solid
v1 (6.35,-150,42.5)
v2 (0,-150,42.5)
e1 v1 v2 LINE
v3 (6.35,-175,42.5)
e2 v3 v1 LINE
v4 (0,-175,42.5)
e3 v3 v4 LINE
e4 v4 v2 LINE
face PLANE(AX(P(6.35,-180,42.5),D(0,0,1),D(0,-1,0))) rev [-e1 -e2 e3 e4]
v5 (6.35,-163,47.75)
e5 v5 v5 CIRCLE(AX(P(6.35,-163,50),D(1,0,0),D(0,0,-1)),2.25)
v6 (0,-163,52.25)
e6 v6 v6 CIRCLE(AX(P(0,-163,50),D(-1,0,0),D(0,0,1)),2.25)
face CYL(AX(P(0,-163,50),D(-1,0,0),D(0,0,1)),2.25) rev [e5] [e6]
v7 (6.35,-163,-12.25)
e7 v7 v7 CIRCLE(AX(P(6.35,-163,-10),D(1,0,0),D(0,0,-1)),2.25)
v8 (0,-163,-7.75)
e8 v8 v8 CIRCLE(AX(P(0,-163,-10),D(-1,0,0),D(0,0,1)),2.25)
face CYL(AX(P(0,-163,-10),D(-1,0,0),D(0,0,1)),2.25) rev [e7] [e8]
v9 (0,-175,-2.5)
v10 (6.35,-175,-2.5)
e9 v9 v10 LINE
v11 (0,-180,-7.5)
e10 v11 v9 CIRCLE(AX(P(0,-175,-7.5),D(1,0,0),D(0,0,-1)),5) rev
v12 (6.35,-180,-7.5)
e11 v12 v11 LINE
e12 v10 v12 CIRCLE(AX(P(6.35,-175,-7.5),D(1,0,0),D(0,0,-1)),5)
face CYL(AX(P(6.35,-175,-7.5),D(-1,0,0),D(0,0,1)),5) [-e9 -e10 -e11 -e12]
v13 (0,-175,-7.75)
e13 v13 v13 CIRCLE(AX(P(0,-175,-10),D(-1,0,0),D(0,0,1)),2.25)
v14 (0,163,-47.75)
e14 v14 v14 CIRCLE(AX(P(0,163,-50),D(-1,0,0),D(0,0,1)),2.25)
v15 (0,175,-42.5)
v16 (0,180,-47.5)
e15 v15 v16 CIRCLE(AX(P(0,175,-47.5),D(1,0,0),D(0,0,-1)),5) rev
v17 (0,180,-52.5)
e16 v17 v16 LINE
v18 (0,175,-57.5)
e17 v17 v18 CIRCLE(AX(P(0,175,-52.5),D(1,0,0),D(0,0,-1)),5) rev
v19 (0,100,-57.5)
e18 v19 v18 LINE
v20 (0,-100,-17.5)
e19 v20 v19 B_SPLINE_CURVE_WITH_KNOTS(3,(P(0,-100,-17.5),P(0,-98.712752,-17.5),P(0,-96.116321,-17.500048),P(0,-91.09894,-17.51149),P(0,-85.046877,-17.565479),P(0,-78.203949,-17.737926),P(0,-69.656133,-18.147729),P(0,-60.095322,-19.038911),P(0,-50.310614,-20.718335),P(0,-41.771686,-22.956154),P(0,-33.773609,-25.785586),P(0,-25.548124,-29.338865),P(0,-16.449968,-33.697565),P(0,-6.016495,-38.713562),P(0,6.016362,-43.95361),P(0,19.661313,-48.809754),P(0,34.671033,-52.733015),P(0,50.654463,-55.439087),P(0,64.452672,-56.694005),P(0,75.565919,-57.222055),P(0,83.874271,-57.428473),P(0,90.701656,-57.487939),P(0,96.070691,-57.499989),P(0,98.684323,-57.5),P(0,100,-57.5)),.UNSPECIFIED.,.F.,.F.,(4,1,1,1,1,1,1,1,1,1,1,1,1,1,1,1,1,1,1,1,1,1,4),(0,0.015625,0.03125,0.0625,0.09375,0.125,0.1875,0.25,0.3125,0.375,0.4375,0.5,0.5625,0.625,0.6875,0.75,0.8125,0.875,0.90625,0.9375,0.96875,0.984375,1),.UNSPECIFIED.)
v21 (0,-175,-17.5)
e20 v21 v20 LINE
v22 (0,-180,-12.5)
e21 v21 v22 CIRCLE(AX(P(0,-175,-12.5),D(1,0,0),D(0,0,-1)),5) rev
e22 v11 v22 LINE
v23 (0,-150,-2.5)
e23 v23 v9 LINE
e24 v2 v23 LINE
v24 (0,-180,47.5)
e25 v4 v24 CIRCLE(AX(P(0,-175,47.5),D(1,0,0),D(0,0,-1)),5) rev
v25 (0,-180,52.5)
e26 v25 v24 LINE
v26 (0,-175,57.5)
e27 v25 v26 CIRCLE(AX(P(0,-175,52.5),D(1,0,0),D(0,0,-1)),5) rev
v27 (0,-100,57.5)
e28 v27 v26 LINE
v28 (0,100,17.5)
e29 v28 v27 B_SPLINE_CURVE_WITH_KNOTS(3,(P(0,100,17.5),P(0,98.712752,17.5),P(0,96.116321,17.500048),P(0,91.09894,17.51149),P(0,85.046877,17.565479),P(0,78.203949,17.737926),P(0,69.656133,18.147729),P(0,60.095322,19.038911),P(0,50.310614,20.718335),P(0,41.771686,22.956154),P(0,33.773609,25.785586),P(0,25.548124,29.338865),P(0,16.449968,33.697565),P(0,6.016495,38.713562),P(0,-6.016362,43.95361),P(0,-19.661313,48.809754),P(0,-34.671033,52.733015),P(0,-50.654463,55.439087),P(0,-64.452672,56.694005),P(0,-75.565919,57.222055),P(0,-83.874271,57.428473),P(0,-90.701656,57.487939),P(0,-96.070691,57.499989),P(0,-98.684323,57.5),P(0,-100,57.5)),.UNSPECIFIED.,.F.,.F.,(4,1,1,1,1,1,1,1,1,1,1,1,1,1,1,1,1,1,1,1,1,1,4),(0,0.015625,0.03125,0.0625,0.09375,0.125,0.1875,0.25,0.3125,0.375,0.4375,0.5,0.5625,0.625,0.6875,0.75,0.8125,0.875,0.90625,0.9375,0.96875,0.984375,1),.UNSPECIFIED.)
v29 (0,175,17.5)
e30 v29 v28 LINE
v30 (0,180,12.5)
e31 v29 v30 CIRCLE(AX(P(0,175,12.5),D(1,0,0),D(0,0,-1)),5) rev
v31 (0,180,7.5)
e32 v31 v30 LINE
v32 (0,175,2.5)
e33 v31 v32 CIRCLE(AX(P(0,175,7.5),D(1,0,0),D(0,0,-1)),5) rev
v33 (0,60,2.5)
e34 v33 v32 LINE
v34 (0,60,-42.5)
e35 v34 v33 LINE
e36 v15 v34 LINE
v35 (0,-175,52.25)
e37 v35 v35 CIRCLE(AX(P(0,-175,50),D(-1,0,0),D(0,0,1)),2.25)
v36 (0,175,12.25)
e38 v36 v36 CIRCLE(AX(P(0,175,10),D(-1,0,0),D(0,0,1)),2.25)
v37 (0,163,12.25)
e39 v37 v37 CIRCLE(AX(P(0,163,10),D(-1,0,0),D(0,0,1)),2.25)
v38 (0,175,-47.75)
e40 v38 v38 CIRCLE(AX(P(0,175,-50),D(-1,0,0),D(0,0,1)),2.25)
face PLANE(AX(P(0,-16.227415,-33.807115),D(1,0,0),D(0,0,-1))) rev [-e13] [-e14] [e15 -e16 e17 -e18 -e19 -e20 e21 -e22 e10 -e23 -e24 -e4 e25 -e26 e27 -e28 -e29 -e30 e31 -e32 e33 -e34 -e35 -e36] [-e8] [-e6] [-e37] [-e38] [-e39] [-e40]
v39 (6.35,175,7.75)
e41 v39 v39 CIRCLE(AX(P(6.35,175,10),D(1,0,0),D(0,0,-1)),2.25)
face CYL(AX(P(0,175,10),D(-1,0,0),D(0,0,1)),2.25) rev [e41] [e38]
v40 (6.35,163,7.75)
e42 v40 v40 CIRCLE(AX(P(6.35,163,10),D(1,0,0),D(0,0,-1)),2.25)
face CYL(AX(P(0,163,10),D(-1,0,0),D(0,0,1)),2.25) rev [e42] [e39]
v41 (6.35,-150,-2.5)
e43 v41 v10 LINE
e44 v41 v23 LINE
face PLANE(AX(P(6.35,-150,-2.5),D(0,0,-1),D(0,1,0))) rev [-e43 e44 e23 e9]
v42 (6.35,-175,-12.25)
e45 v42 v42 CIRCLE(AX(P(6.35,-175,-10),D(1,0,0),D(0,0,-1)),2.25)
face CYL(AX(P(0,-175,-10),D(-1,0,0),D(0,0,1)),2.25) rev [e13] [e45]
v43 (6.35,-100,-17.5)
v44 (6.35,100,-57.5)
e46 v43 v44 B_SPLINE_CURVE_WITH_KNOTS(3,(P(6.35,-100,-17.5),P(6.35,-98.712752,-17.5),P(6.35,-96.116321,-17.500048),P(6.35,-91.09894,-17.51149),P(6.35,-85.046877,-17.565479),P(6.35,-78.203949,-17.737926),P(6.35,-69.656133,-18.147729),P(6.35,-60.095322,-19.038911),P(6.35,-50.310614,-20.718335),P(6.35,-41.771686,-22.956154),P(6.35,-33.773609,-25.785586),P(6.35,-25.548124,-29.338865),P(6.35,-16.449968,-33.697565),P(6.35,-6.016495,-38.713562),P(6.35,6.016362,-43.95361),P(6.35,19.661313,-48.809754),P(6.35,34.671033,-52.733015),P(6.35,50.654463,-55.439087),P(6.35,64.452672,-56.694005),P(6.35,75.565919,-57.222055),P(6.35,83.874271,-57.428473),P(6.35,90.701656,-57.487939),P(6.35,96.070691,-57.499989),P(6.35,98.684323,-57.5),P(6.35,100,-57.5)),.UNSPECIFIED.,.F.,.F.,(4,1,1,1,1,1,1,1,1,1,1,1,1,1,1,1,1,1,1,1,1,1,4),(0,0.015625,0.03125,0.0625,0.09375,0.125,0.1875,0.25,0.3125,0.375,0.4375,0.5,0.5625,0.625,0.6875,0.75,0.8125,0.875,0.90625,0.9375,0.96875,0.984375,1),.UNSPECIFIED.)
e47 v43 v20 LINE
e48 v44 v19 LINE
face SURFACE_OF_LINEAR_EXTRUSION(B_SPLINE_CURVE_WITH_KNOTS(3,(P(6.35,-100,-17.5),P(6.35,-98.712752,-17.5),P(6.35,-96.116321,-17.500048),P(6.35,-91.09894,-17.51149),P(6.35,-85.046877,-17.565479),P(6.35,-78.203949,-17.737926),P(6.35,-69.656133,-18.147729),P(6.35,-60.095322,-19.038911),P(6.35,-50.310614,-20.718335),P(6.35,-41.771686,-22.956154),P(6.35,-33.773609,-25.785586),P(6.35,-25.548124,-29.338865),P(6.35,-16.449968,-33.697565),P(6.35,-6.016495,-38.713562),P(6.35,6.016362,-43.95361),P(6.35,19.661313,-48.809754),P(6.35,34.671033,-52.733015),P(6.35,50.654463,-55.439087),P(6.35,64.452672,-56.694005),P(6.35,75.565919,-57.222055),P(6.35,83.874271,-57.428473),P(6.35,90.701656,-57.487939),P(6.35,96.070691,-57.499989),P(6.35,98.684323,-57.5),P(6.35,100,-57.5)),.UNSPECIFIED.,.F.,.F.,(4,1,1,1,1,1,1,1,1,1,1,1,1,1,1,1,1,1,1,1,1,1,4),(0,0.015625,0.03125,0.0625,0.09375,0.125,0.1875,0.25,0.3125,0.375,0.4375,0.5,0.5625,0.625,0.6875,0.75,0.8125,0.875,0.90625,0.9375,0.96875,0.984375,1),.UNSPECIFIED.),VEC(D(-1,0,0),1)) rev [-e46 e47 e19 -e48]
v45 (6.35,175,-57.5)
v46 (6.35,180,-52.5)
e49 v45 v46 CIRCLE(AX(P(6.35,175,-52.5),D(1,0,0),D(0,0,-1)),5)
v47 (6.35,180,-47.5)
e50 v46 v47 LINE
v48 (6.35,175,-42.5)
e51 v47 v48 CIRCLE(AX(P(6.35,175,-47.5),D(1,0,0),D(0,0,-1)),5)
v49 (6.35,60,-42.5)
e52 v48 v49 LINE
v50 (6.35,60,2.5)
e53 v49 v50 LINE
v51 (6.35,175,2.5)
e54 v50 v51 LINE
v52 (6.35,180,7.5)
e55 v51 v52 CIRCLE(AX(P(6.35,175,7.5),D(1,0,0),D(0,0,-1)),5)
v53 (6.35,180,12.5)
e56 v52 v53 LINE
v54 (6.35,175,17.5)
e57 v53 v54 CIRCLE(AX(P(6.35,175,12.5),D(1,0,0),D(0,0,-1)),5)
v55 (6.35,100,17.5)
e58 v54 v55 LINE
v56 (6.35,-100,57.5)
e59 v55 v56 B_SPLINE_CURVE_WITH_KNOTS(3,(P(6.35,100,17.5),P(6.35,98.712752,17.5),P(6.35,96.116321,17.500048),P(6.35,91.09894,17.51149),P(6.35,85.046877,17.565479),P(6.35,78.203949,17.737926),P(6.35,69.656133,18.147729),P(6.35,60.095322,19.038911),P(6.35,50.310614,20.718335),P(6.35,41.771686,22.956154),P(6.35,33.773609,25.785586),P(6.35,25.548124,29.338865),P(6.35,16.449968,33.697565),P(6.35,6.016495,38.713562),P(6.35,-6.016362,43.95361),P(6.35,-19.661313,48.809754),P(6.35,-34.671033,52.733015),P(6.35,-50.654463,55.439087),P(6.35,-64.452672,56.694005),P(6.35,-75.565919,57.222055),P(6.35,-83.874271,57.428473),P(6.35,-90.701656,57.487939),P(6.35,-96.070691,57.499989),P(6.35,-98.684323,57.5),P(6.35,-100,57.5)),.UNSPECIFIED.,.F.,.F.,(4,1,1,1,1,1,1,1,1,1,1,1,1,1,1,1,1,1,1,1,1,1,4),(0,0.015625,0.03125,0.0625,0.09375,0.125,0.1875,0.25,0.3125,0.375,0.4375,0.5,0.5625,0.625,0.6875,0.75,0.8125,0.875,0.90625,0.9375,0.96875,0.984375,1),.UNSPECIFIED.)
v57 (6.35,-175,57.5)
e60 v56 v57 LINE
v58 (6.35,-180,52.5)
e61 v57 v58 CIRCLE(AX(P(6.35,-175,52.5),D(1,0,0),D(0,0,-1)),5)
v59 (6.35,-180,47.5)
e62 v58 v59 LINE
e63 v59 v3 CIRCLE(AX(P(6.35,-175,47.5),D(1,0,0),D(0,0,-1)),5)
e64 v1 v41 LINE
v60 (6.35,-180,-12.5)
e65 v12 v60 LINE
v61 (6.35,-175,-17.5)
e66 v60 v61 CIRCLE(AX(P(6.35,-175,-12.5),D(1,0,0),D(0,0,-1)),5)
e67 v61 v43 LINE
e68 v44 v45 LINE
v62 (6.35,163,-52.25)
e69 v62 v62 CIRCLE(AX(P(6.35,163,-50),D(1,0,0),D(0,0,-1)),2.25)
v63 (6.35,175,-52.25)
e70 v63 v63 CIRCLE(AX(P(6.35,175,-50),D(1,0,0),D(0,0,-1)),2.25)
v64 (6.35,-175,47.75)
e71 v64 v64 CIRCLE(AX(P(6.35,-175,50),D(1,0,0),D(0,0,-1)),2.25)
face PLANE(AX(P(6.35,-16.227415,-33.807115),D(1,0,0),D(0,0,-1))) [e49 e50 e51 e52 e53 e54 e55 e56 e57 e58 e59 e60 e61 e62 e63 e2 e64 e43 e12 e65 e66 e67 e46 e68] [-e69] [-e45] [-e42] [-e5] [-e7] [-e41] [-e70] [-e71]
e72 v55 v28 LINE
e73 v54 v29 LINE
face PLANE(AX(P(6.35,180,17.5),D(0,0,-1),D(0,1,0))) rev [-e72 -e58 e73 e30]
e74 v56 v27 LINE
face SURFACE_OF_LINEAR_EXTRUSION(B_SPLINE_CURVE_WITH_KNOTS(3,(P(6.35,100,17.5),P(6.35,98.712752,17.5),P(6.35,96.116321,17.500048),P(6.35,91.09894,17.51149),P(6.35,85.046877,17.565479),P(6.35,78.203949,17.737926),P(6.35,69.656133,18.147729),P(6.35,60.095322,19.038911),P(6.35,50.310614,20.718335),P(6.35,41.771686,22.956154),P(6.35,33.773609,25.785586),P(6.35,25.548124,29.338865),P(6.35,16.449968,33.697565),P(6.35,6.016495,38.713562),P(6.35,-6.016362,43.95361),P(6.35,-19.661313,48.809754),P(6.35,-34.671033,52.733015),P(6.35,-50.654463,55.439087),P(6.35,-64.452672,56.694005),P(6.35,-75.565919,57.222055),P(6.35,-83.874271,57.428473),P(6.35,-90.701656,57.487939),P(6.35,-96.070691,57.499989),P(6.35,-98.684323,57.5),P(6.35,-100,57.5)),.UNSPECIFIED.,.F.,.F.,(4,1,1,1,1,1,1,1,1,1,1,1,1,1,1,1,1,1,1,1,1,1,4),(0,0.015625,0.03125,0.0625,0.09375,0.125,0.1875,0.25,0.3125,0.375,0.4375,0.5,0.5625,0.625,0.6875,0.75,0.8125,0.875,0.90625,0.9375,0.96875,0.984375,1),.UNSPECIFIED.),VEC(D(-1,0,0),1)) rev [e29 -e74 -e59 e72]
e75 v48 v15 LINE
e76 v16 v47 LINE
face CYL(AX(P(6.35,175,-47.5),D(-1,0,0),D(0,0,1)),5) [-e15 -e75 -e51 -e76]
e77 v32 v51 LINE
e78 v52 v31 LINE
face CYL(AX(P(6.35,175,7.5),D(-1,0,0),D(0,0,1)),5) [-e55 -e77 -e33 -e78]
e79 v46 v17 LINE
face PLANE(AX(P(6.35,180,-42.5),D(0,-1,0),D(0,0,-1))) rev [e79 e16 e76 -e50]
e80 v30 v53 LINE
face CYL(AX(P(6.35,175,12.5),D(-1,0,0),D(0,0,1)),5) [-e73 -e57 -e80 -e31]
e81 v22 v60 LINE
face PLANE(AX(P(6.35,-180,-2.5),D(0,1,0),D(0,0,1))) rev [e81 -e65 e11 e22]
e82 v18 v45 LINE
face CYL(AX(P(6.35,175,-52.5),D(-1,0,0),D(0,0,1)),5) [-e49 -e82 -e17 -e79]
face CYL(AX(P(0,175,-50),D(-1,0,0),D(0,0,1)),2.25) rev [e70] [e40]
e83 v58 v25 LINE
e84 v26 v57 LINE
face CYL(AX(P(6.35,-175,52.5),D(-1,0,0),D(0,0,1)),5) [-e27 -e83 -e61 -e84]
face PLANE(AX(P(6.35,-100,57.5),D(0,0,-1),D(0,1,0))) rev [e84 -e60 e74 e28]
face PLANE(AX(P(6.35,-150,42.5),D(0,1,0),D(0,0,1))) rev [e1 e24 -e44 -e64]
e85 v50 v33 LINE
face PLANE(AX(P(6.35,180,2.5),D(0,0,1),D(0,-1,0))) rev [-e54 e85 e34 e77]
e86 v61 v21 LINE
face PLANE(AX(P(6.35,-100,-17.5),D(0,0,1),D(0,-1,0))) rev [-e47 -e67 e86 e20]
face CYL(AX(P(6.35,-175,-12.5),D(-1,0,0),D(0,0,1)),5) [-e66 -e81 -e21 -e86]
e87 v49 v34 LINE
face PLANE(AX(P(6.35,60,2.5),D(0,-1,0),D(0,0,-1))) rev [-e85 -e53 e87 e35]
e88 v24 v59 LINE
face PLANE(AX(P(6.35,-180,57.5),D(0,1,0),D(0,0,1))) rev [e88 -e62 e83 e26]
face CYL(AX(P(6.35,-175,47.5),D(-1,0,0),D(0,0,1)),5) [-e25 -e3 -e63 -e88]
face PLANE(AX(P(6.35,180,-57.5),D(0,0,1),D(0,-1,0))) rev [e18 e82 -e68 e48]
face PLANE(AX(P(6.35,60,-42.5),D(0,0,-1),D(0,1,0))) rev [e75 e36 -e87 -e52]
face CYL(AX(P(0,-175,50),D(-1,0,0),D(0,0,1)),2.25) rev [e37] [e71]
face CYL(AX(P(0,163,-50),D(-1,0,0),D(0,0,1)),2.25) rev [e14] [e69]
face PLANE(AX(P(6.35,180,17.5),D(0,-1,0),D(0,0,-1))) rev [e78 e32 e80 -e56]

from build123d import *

# Parameters (mm, degrees)
SALIENTE_EXTRUIR1_DEPTH      = 6.35
TALADRO_DE_MARGEN_PARA_M41_D = 4.5
REDONDEO1_R                  = 5


# Read off the part's stored shape, not the designer's step: Saliente-Extruir1
with BuildPart() as part:
    # Saliente-Extruir1 outline → Saliente-Extruir1 (new body)
    with BuildSketch(Plane(origin=(0, 0, 0), x_dir=(0, 0, -1), z_dir=(1, 0, 0))):
        with BuildLine():
            Line((-2.5, 180), (-17.5, 180))
            Line((-17.5, 180), (-17.5, 100))
            add(Edge.make_bspline(
                [(-17.5, 100), (-17.5, 98.712751966), (-17.500047788, 96.116321069), (-17.51148981, 91.098940131), (-17.565479393, 85.046877218), (-17.737925717, 78.203948852), (-18.147729277, 69.656133307), (-19.038911227, 60.095322328), (-20.718334539, 50.310614009), (-22.956153632, 41.771686415), (-25.785586207, 33.773608765), (-29.338865081, 25.548124026), (-33.697565336, 16.449967912), (-38.713561507, 6.016494532), (-43.953609584, -6.016361906), (-48.809754323, -19.661313126), (-52.733015331, -34.671033487), (-55.439087369, -50.654463146), (-56.694005293, -64.452671708), (-57.222054598, -75.565918854), (-57.428472519, -83.87427142), (-57.487938926, -90.701655992), (-57.499988878, -96.070691027), (-57.5, -98.684323127), (-57.5, -100)],
                knots=[0, 0, 0, 0, 0.015625, 0.03125, 0.0625, 0.09375, 0.125, 0.1875, 0.25, 0.3125, 0.375, 0.4375, 0.5, 0.5625, 0.625, 0.6875, 0.75, 0.8125, 0.875, 0.90625, 0.9375, 0.96875, 0.984375, 1, 1, 1, 1], degree=3))
            Line((-57.5, -100), (-57.5, -180))
            Line((-57.5, -180), (-42.5, -180))
            Line((-42.5, -180), (-42.5, -150))
            Line((-42.5, -150), (2.5, -150))
            Line((2.5, -150), (2.5, -180))
            Line((2.5, -180), (17.5, -180))
            Line((17.5, -180), (17.5, -100))
            add(Edge.make_bspline(
                [(17.5, -100), (17.5, -98.712751966), (17.500047788, -96.116321069), (17.51148981, -91.098940131), (17.565479393, -85.046877218), (17.737925717, -78.203948852), (18.147729277, -69.656133307), (19.038911227, -60.095322328), (20.718334539, -50.310614009), (22.956153632, -41.771686415), (25.785586207, -33.773608765), (29.338865081, -25.548124026), (33.697565336, -16.449967912), (38.713561507, -6.016494532), (43.953609584, 6.016361906), (48.809754323, 19.661313126), (52.733015331, 34.671033487), (55.439087369, 50.654463146), (56.694005293, 64.452671708), (57.222054598, 75.565918854), (57.428472519, 83.87427142), (57.487938926, 90.701655992), (57.499988878, 96.070691027), (57.5, 98.684323127), (57.5, 100)],
                knots=[0, 0, 0, 0, 0.015625, 0.03125, 0.0625, 0.09375, 0.125, 0.1875, 0.25, 0.3125, 0.375, 0.4375, 0.5, 0.5625, 0.625, 0.6875, 0.75, 0.8125, 0.875, 0.90625, 0.9375, 0.96875, 0.984375, 1, 1, 1, 1], degree=3))
            Line((57.5, 100), (57.5, 180))
            Line((57.5, 180), (42.5, 180))
            Line((42.5, 180), (42.5, 60))
            Line((42.5, 60), (-2.5, 60))
            Line((-2.5, 60), (-2.5, 180))
        make_face()
    extrude(amount=SALIENTE_EXTRUIR1_DEPTH)

    # Taladro de margen para M41 (through all)
    with Locations(Plane.ZY):
        with Locations((10, 163), (10, 175), (-50, 163), (-50, 175), (50, -175), (50, -163), (-10, -175), (-10, -163)):
            Hole(TALADRO_DE_MARGEN_PARA_M41_D / 2)

    # Redondeo1
    redondeo1_edges = [part.edges().sort_by_distance(p)[0] for p in [
        (3.175, 180, 2.5),
        (3.175, 180, -42.5),
        (3.175, 180, -57.5),
        (3.175, -180, -17.5),
        (3.175, -180, -2.5),
        (3.175, -180, 42.5),
        (3.175, -180, 57.5),
        (3.175, 180, 17.5),
    ]]
    fillet(redondeo1_edges, radius=REDONDEO1_R)


solid = part.part
